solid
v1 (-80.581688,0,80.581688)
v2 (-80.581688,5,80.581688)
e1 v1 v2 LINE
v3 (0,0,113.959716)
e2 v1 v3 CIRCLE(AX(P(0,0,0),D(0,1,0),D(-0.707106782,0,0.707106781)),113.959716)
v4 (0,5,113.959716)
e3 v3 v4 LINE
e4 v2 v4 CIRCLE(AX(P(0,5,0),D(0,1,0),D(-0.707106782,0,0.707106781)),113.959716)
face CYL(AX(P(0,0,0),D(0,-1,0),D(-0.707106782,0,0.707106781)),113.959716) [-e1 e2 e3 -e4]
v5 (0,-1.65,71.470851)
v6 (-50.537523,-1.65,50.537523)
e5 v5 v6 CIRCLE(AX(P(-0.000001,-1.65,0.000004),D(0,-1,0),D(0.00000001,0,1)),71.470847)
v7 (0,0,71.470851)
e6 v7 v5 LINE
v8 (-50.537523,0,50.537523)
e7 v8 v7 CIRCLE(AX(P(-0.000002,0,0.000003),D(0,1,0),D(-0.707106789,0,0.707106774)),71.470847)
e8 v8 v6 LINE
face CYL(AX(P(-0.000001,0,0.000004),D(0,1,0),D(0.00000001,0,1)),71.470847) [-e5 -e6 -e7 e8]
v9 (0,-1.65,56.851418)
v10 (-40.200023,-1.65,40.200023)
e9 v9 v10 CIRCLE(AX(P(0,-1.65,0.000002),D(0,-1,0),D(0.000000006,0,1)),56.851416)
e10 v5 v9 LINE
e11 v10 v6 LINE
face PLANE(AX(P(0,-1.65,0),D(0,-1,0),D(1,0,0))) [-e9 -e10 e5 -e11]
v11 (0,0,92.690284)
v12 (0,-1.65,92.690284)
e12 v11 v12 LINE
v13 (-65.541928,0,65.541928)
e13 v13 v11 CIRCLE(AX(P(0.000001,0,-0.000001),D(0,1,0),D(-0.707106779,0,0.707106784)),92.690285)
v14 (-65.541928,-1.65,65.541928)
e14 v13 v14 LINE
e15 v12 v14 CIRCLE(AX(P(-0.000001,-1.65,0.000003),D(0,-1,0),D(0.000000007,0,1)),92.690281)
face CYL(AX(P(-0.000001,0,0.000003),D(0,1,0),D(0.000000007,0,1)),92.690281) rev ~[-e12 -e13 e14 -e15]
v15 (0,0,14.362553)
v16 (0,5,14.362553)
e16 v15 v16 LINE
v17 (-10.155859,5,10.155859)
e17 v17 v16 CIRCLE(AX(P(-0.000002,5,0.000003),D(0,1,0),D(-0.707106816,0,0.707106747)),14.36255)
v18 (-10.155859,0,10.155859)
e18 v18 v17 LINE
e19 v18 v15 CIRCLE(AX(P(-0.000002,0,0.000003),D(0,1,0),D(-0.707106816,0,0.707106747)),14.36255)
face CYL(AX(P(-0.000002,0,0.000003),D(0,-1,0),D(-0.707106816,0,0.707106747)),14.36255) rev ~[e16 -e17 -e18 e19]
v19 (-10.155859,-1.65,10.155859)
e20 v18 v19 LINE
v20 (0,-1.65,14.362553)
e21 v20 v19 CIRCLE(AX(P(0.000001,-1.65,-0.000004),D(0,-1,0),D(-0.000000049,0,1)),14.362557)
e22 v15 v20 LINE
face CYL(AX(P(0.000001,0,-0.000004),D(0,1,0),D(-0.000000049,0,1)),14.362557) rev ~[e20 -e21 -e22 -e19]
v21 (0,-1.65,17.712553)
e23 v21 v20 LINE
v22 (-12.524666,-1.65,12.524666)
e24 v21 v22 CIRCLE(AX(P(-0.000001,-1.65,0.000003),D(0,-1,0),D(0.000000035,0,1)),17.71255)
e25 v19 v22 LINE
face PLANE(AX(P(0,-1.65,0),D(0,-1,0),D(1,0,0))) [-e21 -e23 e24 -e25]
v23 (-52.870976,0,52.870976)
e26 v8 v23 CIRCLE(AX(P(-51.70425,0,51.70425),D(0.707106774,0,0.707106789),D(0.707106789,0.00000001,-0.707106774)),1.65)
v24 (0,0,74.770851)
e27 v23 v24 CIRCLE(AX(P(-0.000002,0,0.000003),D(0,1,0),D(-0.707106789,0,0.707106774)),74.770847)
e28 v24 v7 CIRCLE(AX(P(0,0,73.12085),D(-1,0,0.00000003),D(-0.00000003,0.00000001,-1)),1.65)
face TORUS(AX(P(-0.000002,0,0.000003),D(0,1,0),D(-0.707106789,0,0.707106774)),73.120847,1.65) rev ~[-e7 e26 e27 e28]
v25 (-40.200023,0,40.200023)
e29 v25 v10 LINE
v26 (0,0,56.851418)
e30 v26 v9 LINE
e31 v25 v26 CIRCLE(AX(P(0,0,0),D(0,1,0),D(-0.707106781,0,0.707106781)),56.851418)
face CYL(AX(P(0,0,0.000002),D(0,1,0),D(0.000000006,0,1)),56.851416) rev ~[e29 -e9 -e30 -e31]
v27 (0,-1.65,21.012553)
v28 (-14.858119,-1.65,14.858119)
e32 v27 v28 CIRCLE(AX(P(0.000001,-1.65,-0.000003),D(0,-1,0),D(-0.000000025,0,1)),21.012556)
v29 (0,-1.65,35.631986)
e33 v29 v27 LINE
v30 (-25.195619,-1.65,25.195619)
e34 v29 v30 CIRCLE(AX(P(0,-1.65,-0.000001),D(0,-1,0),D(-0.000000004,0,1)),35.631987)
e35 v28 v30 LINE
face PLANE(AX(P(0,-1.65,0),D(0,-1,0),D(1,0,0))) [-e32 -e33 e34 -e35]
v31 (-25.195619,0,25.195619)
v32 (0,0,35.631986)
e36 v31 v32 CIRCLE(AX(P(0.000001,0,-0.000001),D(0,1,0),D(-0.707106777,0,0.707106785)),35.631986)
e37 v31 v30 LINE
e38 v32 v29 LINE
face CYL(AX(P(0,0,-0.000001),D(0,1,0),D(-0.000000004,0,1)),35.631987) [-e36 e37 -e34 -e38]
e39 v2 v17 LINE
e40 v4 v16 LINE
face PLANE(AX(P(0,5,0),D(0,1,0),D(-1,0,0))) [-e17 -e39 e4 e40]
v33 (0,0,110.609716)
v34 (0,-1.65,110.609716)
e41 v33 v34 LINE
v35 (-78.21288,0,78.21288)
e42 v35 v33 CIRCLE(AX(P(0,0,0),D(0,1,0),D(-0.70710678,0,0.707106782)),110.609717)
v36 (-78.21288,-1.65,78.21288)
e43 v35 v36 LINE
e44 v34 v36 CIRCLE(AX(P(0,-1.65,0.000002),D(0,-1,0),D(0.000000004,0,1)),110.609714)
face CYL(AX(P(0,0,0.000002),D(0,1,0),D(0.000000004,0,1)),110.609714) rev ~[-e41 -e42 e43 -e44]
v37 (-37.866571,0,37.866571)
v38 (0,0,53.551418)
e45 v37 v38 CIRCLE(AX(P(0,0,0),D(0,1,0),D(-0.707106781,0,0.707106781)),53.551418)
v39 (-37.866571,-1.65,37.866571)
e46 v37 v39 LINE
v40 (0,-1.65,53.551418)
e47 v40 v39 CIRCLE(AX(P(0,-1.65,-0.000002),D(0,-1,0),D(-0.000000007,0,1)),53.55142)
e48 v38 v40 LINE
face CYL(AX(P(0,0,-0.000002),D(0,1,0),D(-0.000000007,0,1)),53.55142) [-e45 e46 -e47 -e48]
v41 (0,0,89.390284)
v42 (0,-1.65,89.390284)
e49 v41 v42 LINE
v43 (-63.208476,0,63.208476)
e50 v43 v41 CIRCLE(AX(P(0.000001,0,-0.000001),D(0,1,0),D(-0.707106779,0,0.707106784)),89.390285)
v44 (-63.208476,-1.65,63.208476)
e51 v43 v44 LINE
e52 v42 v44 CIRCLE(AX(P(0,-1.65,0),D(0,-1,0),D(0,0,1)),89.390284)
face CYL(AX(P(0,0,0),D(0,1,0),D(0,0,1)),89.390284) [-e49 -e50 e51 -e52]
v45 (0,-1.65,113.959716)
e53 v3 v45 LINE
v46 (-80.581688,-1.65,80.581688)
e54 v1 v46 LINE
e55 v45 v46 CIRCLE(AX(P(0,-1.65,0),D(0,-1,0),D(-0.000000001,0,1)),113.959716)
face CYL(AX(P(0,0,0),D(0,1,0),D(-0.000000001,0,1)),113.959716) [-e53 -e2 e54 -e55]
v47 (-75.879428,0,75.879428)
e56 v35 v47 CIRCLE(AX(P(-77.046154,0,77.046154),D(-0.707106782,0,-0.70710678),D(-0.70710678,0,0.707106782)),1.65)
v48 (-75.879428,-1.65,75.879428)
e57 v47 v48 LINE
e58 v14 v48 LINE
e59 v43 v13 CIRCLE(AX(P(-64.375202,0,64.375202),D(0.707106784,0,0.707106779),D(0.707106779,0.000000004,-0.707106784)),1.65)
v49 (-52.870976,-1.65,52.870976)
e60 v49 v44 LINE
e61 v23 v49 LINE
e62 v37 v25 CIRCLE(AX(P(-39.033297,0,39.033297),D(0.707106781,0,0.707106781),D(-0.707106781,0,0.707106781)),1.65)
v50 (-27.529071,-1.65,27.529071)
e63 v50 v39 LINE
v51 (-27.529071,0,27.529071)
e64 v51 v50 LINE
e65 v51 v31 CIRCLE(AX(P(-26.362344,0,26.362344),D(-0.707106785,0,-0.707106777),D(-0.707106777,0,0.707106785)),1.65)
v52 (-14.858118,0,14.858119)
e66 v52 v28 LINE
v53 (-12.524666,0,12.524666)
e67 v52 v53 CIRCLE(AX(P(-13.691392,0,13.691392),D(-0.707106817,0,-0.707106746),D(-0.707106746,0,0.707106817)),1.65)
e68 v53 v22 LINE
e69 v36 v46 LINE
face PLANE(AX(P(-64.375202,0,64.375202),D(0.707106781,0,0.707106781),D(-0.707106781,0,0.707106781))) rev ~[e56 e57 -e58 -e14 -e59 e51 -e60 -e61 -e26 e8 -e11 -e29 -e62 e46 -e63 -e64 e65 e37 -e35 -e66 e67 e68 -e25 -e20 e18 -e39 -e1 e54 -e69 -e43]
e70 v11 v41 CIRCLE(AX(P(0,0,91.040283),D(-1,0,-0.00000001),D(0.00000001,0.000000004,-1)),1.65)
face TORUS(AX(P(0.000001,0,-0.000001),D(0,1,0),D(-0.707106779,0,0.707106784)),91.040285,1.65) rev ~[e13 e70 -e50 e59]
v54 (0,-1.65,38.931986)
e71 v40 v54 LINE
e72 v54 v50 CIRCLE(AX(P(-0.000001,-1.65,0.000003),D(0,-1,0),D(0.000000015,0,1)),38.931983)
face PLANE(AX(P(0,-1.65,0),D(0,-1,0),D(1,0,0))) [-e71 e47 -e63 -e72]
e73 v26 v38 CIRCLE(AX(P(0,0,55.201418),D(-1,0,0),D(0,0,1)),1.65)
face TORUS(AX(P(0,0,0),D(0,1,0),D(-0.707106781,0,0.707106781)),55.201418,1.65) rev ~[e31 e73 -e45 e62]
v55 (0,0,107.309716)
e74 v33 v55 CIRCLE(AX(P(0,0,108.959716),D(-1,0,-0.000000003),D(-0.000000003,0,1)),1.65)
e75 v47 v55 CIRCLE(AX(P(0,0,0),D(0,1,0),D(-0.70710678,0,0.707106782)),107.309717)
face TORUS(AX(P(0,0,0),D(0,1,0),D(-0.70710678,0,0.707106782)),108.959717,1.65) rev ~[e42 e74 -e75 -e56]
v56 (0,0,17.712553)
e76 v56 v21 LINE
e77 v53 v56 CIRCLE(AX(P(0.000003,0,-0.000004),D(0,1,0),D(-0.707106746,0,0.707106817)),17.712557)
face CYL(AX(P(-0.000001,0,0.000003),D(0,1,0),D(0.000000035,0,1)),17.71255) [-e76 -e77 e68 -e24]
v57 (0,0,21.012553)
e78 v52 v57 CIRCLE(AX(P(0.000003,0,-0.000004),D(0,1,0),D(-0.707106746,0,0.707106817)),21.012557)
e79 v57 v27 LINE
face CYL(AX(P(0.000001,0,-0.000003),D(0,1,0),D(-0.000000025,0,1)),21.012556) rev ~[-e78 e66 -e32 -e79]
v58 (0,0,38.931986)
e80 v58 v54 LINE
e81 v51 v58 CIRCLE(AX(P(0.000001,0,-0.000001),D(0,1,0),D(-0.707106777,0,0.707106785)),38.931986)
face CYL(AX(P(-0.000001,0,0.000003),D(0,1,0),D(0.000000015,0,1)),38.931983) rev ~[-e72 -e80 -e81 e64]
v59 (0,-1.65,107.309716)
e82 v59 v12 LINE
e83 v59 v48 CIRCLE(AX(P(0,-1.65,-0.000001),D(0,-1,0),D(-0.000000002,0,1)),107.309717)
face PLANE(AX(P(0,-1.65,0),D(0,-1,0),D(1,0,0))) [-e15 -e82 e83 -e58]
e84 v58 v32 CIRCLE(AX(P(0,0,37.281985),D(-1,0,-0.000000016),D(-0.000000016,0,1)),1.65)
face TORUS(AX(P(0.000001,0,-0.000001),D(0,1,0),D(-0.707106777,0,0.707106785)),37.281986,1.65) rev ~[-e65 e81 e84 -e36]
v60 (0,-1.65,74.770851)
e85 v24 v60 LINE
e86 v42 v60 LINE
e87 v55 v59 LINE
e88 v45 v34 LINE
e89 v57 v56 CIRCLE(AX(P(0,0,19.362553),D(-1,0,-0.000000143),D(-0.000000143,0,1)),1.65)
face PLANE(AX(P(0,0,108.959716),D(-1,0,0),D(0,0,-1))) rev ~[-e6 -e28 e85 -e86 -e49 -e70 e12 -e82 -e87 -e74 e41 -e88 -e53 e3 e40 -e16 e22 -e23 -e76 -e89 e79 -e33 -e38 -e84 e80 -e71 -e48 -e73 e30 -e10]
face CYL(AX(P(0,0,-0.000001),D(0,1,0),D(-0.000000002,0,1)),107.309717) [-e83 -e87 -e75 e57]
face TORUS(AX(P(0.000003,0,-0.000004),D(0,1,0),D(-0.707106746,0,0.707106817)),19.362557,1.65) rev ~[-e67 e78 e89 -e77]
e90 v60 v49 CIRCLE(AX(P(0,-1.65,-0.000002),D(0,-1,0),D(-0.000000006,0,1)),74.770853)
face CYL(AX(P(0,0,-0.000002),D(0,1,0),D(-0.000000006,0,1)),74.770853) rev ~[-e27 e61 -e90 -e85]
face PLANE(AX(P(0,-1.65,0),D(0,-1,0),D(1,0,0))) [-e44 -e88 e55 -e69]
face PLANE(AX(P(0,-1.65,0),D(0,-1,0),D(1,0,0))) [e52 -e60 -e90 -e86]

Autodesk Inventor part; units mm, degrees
ref_plane "YZ Plane" through (0, 0, 0) normal (1, 0, 0) x (0, 1, 0)
ref_plane "XZ Plane" through (0, 0, 0) normal (0, 1, 0) x (-1, 0, 0)
ref_plane "XY Plane" through (0, 0, 0) normal (0, 0, 1) x (1, 0, 0)
sketch "Sketch1" plane through (0, 0, 0) normal (0, 1, 0) x (-1, 0, 0)
  arc A0 (77.046154, 77.046154) -> (0, 108.959716) centre (0, 0) ccw
  arc A1 (64.375202, 64.375202) -> (0, 91.040284) centre (0, 0) ccw
  line L0 (0, 113.959716) -> (0, 0)
  arc A2 (51.70425, 51.70425) -> (0, 73.120851) centre (0, 0) ccw
  arc A3 (39.033297, 39.033297) -> (0, 55.201418) centre (0, 0) ccw
  arc A4 (26.362345, 26.362345) -> (0, 37.281986) centre (0, 0) ccw
  arc A5 (70.710678, 70.710678) -> (0, 100) centre (0, 0) ccw construction
  arc A6 (13.691392, 13.691392) -> (0, 19.362553) centre (0, 0) ccw
  line L1 (0, 0) -> (80.581688, 80.581688)
  arc A7 (80.581688, 80.581688) -> (0, 113.959716) centre (0, 0) ccw
  arc A8 (10.155859, 10.155859) -> (0, 14.362553) centre (0, 0) ccw
  dimension "d8" = 45
  dimension "d0" = 17.91943
  dimension "d2" = 8.95972
  dimension "d3" = 200
  dimension "d4" = 17.91943
  dimension "d5" = 17.91943
  dimension "d6" = 17.91943
  dimension "d9" = 17.91943
  dimension "d10" = 5
  dimension "d11" = 5
extrude "Extrusion1" add sketch "Sketch1" along normal blind 5 contours L1 A1 L0 A0 | A0 L0 A7 L1 | L1 A2 L0 A1 | L1 A3 L0 A2 | L1 A4 L0 A3 | L1 A6 L0 A4 | L1 A8 L0 A6
sketch "Sketch2" plane through (-80.581688, 0, 80.581688) normal (-0.7071068, 0, -0.7071068) x (-0.7071068, 0, 0.7071068)
  line L0 (-5, 0) -> (-36.913562, 0)
  line L1 (-22.919433, 0) -> (-49.584514, 0)
  line L2 (-40.838865, 0) -> (-62.255467, 0)
  line L3 (-58.758298, 0) -> (-74.926419, 0)
  line L4 (-76.677731, 0) -> (-87.597372, 0)
  line L5 (-94.597164, 0) -> (-100.268324, 0)
  circle A0 centre (-5, 0) radius 1.65
  circle A1 centre (-22.919433, 0) radius 1.65
  circle A2 centre (-40.838865, 0) radius 1.65
  circle A3 centre (-58.758298, 0) radius 1.65
  circle A4 centre (-76.677731, 0) radius 1.65
  circle A5 centre (-94.597164, 0) radius 1.65
  point P0 (-113.959716, 0)
  dimension "d14" = 3.3
sweep "Sweep1" cut profiles "Sketch2" path "Sketch1" path curves A0 contours A0
sweep "Sweep2" cut profiles "Sketch2" path "Sketch1" path curves A1 contours A1 L0 | L0 A1
sweep "Sweep3" cut profiles "Sketch2" path "Sketch1" path curves A2 contours A2 L1 | L1 A2
sweep "Sweep4" cut profiles "Sketch2" path "Sketch1" path curves A3 contours A3 L2 | L2 A3
sweep "Sweep5" cut profiles "Sketch2" path "Sketch1" path curves A4 contours A4
sweep "Sweep6" cut profiles "Sketch2" path "Sketch1" path curves A6 contours A5
sketch "Sketch3" plane through (0, 0, 0) normal (0, -1, 0) x (1, 0, 0)
  arc A0 (0, 110.609716) -> (-78.21288, 78.21288) centre (0, 0) ccw
  line L0 (0, 113.959716) -> (0, 110.609716)
  arc A1 (0, 113.959716) -> (-80.581688, 80.581688) centre (0, 0) ccw
  line L1 (-78.21288, 78.21288) -> (-80.581688, 80.581688)
  arc A2 (0, 92.690284) -> (-65.541928, 65.541928) centre (0, 0) ccw
  line L2 (0, 107.309716) -> (0, 92.690284)
  arc A3 (0, 107.309716) -> (-75.879428, 75.879428) centre (0, 0) ccw
  line L3 (-65.541928, 65.541928) -> (-75.879428, 75.879428)
  arc A4 (0, 74.770851) -> (-52.870976, 52.870976) centre (0, 0) ccw
  line L4 (0, 89.390284) -> (0, 74.770851)
  arc A5 (0, 89.390284) -> (-63.208476, 63.208476) centre (0, 0) ccw
  line L5 (-52.870976, 52.870976) -> (-63.208476, 63.208476)
  arc A6 (0, 56.851418) -> (-40.200023, 40.200023) centre (0, 0) ccw
  line L6 (0, 71.470851) -> (0, 56.851418)
  arc A7 (0, 71.470851) -> (-50.537523, 50.537523) centre (0, 0) ccw
  line L7 (-40.200023, 40.200023) -> (-50.537523, 50.537523)
  arc A8 (0, 38.931986) -> (-27.529071, 27.529071) centre (0, 0) ccw
  line L8 (0, 53.551418) -> (0, 38.931986)
  arc A9 (0, 53.551418) -> (-37.866571, 37.866571) centre (0, 0) ccw
  line L9 (-27.529071, 27.529071) -> (-37.866571, 37.866571)
  arc A10 (0, 21.012553) -> (-14.858119, 14.858119) centre (0, 0) ccw
  line L10 (0, 35.631986) -> (0, 21.012553)
  arc A11 (0, 35.631986) -> (-25.195619, 25.195619) centre (0, 0) ccw
  line L11 (-14.858119, 14.858119) -> (-25.195619, 25.195619)
  arc A12 (0, 17.712553) -> (-12.524666, 12.524666) centre (0, 0) ccw
  line L12 (-10.155859, 10.155859) -> (-12.524666, 12.524666)
  arc A13 (0, 14.362553) -> (-10.155859, 10.155859) centre (0, 0) ccw
  line L13 (0, 17.712553) -> (0, 14.362553)
extrude "Extrusion2" add sketch "Sketch3" along normal blind 1.65
equation "\"d0\" = d25"
equation "\"d2\" = 0.5 * d25"
equation "\"d4\" = d25"
equation "\"d5\" = d4"
equation "\"d6\" = d5"
equation "\"d9\" = d6"
equation "\"d14\" = trackDiameter"
equation "\"d28\" = 0.5 * trackDiameter"
equation "\"d25\" = 17.919433"
equation "\"trackDiameter\" = 3.3"
properties part number "Curved Track Builder"
